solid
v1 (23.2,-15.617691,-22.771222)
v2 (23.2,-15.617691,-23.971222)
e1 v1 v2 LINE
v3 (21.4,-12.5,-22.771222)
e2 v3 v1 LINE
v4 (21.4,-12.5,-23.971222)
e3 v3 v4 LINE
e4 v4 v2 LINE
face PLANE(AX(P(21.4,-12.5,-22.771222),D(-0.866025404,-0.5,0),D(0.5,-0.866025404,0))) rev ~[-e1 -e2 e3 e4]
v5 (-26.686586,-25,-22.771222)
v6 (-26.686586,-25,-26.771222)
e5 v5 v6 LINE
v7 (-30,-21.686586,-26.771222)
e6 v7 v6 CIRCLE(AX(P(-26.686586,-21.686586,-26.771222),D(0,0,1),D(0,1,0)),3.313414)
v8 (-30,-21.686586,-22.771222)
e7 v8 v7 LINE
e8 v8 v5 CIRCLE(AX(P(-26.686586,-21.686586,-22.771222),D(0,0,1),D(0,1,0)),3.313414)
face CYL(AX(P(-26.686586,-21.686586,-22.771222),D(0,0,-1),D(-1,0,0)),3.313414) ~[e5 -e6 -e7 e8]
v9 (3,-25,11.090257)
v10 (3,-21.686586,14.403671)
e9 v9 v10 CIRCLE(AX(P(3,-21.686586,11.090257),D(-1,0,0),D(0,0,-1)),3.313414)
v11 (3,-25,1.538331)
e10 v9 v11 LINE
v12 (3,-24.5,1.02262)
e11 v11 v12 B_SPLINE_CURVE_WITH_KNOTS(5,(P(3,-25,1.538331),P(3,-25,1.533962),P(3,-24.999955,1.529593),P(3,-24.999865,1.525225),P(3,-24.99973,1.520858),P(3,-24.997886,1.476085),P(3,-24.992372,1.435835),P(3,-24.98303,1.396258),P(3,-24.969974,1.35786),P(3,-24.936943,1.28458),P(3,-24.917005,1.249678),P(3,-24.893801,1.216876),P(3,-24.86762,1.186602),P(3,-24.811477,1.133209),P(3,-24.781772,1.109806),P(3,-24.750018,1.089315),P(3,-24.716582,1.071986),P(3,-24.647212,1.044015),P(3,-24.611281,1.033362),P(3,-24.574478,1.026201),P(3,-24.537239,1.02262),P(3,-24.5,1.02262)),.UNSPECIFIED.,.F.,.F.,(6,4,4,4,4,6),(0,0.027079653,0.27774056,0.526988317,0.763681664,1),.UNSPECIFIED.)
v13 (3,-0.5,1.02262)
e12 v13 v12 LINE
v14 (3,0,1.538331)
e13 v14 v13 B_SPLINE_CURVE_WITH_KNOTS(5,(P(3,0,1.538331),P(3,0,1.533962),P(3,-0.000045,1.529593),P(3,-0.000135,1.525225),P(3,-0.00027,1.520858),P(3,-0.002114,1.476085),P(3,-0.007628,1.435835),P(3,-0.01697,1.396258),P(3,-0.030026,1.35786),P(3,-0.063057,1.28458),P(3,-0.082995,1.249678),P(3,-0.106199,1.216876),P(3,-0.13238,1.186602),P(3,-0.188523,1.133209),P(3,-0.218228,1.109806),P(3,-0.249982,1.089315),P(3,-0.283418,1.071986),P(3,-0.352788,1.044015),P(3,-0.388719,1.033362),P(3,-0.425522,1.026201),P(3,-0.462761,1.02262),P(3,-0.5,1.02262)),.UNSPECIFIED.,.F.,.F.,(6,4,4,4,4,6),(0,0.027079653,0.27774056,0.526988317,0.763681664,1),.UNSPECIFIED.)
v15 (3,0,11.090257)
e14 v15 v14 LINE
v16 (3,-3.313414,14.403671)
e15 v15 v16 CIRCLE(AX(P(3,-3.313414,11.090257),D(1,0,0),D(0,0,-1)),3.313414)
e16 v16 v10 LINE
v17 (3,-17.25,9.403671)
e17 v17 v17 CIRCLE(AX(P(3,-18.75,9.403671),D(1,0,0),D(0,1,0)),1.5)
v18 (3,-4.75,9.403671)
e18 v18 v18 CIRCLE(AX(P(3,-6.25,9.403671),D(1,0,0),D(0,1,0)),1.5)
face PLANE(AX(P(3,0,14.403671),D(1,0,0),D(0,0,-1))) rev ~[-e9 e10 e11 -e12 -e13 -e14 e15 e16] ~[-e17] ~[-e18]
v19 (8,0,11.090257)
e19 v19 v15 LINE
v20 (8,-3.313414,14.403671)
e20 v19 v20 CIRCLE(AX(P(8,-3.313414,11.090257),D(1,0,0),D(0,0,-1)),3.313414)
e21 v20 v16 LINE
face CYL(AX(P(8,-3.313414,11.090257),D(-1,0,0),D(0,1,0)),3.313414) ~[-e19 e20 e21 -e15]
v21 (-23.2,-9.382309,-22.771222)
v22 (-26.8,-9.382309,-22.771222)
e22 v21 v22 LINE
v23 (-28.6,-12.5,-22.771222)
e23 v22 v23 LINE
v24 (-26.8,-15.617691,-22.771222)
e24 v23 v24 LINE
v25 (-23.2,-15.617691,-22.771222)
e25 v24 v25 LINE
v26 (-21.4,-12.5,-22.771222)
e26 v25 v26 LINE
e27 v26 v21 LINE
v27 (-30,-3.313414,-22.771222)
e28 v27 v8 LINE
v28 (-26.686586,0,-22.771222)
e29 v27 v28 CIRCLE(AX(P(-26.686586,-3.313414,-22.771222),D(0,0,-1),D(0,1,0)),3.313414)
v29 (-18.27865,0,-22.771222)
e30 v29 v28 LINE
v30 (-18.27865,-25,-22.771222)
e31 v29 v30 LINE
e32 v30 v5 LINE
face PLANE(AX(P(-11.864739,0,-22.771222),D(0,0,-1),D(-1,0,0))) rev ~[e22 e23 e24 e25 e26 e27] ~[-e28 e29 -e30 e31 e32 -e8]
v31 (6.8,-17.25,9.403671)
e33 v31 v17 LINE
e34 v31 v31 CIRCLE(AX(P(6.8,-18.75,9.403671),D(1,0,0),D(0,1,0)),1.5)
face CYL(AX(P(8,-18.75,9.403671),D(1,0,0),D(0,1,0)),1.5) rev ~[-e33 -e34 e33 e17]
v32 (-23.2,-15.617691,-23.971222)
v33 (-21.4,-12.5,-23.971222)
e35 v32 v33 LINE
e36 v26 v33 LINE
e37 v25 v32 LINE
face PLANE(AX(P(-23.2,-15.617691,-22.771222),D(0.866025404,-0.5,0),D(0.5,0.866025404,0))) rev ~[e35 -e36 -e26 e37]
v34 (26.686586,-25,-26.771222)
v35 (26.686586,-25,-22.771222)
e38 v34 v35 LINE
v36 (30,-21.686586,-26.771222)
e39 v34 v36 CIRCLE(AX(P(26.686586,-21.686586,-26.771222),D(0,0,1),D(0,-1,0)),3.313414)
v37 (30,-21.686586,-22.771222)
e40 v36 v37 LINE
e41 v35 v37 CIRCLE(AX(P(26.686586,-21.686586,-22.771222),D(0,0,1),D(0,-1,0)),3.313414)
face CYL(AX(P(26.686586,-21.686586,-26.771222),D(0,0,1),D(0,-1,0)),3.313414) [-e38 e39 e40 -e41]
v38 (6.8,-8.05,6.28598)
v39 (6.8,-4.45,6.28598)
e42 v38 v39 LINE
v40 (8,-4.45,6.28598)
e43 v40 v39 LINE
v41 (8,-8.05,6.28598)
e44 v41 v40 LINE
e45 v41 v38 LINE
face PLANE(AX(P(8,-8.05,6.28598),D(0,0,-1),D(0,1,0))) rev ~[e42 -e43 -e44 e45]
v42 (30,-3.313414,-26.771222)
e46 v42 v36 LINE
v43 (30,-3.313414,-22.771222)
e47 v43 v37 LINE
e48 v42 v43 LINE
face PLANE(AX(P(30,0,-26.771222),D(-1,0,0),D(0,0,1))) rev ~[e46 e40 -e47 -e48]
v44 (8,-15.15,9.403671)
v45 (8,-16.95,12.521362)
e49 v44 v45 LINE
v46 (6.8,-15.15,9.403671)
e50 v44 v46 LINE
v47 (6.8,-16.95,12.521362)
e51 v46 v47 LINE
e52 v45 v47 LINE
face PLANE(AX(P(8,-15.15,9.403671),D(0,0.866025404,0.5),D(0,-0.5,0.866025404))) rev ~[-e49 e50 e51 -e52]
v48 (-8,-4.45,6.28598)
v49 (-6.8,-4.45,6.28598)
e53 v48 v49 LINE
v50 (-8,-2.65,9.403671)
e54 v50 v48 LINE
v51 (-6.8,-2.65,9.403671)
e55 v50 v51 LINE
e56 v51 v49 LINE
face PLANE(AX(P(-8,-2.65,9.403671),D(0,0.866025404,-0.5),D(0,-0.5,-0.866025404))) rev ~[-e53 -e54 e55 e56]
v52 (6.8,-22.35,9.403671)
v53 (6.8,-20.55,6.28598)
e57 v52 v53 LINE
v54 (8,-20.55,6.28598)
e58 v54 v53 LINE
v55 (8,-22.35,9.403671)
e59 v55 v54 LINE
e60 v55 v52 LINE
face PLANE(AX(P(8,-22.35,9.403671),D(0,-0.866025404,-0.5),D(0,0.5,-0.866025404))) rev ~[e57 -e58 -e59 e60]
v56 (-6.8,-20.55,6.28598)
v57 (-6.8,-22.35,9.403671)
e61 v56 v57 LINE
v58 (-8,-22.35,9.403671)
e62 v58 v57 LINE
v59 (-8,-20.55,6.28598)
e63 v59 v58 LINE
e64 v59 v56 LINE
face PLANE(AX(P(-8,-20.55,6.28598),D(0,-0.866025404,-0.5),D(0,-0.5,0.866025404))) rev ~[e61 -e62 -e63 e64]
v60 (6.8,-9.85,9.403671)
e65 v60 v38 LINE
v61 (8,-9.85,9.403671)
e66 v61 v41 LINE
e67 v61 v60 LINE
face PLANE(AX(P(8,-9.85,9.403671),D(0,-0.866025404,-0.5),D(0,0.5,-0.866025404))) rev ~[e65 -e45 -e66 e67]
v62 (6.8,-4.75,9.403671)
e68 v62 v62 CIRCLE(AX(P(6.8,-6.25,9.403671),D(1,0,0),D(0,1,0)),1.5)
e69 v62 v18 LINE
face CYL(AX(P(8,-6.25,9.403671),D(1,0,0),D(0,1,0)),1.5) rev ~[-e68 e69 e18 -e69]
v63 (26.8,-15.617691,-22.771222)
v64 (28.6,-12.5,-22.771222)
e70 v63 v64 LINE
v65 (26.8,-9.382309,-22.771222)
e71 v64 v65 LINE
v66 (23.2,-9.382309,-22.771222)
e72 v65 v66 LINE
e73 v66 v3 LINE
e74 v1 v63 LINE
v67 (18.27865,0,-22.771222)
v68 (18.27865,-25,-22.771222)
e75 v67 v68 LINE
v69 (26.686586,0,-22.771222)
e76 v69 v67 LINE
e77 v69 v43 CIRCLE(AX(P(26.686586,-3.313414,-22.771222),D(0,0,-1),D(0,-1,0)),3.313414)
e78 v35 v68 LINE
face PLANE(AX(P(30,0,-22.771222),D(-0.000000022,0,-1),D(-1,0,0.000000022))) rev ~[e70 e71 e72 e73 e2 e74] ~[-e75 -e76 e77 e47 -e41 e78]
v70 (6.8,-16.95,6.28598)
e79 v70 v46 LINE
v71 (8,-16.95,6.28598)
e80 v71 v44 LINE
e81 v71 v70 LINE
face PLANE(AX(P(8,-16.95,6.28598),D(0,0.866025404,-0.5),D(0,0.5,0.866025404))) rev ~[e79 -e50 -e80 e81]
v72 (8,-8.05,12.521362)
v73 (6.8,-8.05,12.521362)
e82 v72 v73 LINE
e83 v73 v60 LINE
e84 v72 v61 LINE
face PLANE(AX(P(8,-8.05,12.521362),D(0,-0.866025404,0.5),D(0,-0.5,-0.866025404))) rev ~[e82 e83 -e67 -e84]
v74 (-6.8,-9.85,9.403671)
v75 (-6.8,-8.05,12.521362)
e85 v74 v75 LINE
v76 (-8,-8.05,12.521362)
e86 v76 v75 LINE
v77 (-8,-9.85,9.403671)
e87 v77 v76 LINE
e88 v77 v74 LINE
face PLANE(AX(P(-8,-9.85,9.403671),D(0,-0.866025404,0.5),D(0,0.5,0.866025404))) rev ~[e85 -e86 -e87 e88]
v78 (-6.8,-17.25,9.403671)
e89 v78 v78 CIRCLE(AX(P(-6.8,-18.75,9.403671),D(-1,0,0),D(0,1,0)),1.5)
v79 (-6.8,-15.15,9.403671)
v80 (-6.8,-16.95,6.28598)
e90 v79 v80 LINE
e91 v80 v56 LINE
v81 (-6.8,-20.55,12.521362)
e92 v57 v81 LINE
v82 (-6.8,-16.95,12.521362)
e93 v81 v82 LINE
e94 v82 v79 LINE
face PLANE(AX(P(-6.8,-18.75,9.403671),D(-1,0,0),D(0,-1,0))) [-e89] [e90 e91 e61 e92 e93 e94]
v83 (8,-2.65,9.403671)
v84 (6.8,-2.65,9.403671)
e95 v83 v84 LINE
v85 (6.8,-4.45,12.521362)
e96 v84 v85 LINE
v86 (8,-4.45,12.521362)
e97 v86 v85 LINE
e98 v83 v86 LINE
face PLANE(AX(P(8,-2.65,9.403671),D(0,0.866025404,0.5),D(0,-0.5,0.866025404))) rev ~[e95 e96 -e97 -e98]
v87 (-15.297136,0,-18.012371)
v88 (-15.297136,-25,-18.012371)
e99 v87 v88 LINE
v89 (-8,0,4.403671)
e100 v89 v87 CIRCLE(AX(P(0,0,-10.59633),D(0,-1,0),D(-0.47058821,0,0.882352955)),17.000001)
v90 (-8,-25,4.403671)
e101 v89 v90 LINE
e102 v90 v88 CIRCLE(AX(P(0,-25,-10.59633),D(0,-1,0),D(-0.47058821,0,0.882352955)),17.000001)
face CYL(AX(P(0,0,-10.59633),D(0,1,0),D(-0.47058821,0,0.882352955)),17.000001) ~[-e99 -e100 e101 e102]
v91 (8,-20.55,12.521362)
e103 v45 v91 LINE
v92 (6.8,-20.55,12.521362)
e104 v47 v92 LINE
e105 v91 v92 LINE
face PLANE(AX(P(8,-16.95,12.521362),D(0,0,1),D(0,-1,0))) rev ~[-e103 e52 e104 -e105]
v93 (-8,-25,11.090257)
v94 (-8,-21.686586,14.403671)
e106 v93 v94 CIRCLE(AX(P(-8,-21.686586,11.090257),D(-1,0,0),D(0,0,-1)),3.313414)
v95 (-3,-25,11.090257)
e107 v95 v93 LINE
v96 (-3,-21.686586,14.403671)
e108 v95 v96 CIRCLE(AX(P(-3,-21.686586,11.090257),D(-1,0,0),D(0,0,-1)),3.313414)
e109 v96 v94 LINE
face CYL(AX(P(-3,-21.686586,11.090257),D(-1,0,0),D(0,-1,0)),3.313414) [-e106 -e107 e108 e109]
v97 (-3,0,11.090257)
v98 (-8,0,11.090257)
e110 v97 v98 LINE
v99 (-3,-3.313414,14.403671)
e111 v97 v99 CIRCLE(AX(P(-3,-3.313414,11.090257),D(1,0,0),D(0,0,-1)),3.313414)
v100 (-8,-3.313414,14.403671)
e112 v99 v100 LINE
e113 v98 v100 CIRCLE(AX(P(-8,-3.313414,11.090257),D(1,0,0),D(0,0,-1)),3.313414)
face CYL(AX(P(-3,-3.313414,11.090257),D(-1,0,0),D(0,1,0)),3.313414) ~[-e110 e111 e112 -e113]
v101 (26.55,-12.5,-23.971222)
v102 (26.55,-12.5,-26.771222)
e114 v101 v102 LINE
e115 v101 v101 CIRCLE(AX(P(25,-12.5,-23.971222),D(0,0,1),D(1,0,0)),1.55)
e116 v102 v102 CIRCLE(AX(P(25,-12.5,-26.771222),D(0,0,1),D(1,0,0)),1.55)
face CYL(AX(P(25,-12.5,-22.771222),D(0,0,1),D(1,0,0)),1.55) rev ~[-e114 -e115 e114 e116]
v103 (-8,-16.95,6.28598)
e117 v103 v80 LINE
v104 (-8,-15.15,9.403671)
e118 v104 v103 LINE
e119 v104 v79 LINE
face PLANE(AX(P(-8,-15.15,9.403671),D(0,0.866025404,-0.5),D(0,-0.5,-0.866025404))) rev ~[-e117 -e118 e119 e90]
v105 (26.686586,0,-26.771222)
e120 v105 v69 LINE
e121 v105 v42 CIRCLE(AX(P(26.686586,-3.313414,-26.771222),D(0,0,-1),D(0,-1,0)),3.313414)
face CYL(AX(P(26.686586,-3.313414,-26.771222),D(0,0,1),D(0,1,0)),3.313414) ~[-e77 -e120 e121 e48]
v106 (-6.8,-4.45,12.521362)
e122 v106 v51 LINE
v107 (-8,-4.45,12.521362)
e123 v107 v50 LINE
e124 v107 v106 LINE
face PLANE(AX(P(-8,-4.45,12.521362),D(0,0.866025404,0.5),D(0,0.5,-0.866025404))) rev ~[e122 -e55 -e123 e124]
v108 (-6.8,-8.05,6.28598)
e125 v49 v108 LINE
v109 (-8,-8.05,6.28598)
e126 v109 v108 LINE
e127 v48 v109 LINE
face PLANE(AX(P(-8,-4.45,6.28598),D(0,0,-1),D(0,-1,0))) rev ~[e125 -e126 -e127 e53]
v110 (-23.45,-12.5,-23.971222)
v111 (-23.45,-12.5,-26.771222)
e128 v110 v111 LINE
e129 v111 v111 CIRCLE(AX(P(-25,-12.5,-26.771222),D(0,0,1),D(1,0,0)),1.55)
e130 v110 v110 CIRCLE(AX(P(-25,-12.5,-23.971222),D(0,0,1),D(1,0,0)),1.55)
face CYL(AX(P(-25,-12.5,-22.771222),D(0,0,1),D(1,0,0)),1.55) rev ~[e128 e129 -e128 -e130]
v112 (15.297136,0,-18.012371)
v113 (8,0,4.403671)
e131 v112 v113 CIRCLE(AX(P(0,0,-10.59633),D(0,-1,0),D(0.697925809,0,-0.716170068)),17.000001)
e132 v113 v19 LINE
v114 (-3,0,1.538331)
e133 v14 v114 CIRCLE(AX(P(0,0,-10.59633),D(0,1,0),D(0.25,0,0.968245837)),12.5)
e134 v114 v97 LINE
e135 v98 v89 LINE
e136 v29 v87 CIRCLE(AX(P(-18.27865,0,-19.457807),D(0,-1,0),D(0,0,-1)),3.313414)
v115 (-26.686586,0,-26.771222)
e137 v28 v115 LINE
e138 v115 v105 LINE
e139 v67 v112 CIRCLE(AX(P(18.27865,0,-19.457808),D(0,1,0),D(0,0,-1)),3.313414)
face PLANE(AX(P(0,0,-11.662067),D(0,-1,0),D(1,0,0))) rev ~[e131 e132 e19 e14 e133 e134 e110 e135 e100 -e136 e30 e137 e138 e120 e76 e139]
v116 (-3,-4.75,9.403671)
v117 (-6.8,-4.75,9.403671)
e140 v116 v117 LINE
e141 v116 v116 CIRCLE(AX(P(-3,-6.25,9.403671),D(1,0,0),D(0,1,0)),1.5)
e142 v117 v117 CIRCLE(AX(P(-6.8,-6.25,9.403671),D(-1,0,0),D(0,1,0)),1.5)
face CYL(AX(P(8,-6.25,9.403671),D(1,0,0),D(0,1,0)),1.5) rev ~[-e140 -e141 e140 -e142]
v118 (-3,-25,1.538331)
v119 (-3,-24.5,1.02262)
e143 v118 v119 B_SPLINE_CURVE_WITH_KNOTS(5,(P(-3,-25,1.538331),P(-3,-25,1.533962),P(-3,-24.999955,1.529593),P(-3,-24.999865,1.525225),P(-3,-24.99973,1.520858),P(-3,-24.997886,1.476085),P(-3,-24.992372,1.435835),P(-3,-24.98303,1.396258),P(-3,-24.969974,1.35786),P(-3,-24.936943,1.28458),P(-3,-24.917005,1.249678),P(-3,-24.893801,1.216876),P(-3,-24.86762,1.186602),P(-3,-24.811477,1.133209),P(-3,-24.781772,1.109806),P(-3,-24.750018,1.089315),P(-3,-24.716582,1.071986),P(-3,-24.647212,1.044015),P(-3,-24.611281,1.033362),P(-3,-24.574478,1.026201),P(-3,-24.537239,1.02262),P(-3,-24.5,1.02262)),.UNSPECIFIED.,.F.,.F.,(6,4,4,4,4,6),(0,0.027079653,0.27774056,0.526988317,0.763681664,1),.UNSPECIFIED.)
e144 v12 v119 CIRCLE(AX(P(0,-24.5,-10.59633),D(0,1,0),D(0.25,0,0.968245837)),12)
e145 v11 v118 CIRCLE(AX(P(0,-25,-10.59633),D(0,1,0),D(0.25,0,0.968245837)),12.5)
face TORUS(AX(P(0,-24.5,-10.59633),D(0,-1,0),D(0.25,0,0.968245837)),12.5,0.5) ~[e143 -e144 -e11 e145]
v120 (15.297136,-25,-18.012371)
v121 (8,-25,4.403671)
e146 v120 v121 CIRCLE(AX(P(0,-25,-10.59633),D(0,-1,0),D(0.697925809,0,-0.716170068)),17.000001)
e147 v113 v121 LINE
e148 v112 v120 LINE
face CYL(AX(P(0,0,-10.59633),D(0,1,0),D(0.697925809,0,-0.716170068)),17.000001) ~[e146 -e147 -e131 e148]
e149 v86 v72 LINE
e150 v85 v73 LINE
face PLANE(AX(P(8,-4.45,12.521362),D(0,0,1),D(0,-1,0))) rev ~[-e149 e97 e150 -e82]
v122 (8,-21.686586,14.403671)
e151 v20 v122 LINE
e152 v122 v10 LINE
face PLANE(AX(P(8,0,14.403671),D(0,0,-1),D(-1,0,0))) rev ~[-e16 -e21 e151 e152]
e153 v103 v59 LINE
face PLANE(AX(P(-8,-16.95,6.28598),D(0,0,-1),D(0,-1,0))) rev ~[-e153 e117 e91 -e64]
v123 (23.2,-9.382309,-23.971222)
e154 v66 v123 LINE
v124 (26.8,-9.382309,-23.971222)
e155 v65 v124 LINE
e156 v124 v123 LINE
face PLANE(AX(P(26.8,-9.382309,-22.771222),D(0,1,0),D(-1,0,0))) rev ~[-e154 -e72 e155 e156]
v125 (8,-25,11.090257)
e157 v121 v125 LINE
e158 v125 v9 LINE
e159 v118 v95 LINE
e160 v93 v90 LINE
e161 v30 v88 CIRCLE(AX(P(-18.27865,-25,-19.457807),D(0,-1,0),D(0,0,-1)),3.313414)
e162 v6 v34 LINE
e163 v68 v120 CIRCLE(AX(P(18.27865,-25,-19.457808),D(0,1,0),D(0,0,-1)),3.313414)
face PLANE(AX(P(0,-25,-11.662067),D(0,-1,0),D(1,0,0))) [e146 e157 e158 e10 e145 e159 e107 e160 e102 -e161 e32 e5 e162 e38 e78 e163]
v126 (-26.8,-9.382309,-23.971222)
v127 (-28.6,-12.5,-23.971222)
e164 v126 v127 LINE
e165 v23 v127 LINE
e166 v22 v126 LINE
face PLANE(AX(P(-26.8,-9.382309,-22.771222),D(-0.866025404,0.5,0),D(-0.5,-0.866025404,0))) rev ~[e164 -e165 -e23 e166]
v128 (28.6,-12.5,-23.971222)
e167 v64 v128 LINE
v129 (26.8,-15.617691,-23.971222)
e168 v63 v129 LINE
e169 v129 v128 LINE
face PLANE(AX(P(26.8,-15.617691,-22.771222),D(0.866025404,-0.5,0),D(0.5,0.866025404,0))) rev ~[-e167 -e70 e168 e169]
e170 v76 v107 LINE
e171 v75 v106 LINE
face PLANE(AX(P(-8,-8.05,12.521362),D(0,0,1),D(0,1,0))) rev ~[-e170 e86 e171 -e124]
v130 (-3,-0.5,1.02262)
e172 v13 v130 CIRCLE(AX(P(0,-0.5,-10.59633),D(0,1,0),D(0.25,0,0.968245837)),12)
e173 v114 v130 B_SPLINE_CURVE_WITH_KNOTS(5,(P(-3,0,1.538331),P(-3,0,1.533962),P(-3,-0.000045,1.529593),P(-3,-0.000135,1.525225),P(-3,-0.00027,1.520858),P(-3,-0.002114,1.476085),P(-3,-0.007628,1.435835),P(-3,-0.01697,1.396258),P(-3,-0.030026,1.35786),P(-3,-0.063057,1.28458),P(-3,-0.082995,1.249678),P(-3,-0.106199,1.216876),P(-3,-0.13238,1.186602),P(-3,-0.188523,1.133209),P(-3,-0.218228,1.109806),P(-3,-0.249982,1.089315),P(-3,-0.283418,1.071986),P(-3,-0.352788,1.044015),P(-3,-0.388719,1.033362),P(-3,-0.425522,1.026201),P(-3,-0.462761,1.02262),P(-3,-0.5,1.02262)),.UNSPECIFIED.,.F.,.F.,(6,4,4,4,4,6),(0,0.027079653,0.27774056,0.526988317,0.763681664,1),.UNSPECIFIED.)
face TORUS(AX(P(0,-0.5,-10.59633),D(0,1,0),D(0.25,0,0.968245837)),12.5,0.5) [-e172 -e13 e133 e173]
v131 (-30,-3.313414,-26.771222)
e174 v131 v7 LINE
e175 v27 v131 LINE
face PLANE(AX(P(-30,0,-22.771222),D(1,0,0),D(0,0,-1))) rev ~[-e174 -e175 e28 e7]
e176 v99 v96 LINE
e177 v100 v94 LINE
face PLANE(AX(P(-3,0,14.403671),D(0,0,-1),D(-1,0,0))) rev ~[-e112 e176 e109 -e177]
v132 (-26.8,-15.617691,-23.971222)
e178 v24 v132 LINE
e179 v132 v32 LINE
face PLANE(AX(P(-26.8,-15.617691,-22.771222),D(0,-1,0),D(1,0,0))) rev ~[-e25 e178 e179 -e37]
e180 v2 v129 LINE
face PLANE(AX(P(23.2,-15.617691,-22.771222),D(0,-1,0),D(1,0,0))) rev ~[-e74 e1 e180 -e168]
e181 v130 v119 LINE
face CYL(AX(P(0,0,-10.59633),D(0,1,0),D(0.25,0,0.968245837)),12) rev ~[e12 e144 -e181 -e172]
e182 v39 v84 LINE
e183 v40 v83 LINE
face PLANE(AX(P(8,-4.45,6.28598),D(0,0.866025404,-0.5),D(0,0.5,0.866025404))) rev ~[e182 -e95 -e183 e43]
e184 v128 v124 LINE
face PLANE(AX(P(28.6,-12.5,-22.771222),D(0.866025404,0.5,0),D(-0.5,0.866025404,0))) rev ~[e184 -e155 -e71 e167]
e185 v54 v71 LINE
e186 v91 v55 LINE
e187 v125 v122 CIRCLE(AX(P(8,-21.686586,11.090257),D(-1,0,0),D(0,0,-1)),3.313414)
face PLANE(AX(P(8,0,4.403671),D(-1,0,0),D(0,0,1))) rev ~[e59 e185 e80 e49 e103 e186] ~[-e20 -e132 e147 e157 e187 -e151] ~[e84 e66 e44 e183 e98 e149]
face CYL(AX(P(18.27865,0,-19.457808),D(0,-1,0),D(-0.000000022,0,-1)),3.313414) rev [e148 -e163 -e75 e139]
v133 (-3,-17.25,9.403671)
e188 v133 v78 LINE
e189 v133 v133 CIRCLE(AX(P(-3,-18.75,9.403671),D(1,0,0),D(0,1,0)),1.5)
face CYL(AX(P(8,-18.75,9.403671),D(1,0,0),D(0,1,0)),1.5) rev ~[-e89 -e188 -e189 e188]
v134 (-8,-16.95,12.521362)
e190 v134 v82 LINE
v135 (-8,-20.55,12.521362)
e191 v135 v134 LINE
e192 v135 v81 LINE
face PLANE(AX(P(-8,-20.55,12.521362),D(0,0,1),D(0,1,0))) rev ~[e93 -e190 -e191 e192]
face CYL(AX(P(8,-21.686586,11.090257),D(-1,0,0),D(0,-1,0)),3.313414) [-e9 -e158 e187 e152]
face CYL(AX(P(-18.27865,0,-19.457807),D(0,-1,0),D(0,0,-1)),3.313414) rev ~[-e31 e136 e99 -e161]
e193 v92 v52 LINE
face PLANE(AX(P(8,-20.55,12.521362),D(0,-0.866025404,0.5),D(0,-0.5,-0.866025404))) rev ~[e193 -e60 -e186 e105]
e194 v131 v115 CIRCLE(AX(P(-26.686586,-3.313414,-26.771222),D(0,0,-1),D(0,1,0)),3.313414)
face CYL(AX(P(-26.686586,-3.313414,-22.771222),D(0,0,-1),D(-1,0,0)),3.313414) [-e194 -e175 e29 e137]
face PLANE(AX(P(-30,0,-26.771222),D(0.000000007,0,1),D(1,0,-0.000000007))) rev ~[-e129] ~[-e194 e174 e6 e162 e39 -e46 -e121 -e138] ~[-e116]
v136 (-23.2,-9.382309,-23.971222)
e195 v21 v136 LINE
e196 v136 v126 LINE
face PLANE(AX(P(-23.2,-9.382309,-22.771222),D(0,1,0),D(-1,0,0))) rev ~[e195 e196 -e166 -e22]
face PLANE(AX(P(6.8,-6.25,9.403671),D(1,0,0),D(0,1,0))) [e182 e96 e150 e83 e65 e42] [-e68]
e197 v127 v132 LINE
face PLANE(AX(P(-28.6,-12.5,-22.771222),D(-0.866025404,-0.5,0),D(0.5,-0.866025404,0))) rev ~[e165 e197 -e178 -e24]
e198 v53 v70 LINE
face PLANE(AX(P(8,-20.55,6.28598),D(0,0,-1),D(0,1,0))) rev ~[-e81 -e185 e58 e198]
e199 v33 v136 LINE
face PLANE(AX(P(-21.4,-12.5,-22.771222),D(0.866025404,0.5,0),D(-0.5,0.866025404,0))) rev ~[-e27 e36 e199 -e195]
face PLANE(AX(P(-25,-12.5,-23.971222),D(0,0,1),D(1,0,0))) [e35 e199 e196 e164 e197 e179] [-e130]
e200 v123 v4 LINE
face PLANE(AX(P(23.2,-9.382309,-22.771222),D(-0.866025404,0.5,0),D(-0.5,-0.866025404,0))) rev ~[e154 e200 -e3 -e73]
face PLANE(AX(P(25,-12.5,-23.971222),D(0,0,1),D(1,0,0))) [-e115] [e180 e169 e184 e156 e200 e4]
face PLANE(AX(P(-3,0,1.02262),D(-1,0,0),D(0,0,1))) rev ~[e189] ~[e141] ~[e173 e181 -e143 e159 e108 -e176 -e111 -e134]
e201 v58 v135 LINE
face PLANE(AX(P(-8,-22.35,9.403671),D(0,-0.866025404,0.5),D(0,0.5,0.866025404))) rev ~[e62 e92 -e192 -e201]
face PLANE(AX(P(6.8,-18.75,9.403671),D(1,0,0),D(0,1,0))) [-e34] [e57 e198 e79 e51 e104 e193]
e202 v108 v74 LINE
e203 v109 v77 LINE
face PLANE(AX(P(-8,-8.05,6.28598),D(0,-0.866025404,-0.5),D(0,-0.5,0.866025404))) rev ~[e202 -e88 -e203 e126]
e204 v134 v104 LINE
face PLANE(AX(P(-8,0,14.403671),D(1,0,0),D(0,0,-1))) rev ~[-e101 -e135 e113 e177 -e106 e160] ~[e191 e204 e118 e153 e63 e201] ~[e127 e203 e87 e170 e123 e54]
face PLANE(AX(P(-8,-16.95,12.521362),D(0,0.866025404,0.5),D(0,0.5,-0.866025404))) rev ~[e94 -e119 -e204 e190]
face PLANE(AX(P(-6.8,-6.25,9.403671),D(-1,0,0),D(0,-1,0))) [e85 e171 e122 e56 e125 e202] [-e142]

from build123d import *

# Parameters (mm, degrees)
F1_DEPTH  = 25
F2_R      = 1.55
F3_DEPTH  = 25
F4_R      = 1.5
F5_DEPTH  = 25
F6_R      = 3.3134143982
F9_DEPTH  = 1.2
F8_R      = 1.5
F10_DEPTH = 1.2
F12_DEPTH = 1.2
F13_R     = 0.5


# Not quite as in the source:
# - ends of sketch curves that miss each other by under 0.0002 mm in the source are joined


with BuildPart() as f1:
    # F0 (on Front) → F1 (new body)
    with BuildSketch(Plane.XZ):
        with BuildLine():
            Line((-30, -26.7712218283), (30, -26.771222222))
            Line((30, -26.771222222), (30, -22.771222222))
            Line((30, -22.771222222), (11.8647393899, -22.7712218283))
            ThreePointArc((11.8647393899, -22.7712218283), (16.8306466966, -8.2027211962), (8, 4.4036710302))
            Line((8, 4.4036710302), (8, 14.4036710302))
            Line((8, 14.4036710302), (3, 14.4036710302))
            Line((3, 14.4036710302), (3, 6.1368714524))
            Line((3, 6.1368714524), (3, 4.8868714524))
            Line((3, 4.8868714524), (3, 1.0226200218))
            ThreePointArc((3, 1.0226200218), (0, -22.5963300169), (-3, 1.0226200218))
            Line((-3, 1.0226200218), (-3, 4.8868714524))
            Line((-3, 4.8868714524), (-3, 14.4036710302))
            Line((-3, 14.4036710302), (-8, 14.4036710302))
            Line((-8, 14.4036710302), (-8, 4.4036710302))
            ThreePointArc((-8, 4.4036710302), (-16.8306466966, -8.2027211962), (-11.8647393899, -22.7712218283))
            Line((-11.8647393899, -22.7712218283), (-30, -22.7712218283))
            Line((-30, -22.7712218283), (-30, -26.7712218283))
        make_face()
    extrude(amount=F1_DEPTH)

    # F2 (on face) → F3 (cut)
    with BuildSketch(Plane.XY.offset(-22.7712218283)):
        with Locations((-25, -12.5)):
            Circle(F2_R)
        with Locations((25, -12.5)):
            Circle(F2_R)
    extrude(amount=-F3_DEPTH, mode=Mode.SUBTRACT)

    # F4 (on face) → F5 (cut)
    with BuildSketch(Plane.YZ.offset(8)):
        with Locations((-18.75, 9.4036710302)):
            Circle(F4_R)
        with Locations((-6.25, 9.4036710302)):
            Circle(F4_R)
    extrude(amount=-F5_DEPTH, mode=Mode.SUBTRACT)

    # F6
    f6_edges = [f1.edges().sort_by_distance(p)[0] for p in [
        (-5.5, -25, 14.403671),
        (5.5, -25, 14.403671),
        (-5.5, 0, 14.403671),
        (5.5, 0, 14.403671),
        (30, -25, -24.771222),
        (30, 0, -24.771222),
        (-30, 0, -24.771222),
        (-30, -25, -24.771222),
        (11.864739, -12.5, -22.771222),
        (-11.864739, -12.5, -22.771222),
    ]]
    fillet(f6_edges, radius=F6_R)

    # F7 (on face) → F9 (cut)
    with BuildSketch(Plane.YZ.offset(8)):
        Polygon((-20.55, 6.2859795766), (-16.95, 6.2859795766), (-15.15, 9.4036710302), (-16.95, 12.5213624838), (-20.55, 12.5213624838), (-22.35, 9.4036710302), align=None)
        Polygon((-4.45, 12.5213624838), (-8.05, 12.5213624838), (-9.85, 9.4036710302), (-8.05, 6.2859795766), (-4.45, 6.2859795766), (-2.65, 9.4036710302), align=None)
    extrude(amount=-F9_DEPTH, mode=Mode.SUBTRACT)

    # F8 (on face) → F10 (cut)
    with BuildSketch(Plane(origin=(-8, 0, 0), x_dir=(0, -1, 0), z_dir=(-1, 0, 0))):
        Polygon((4.45, 6.2859795766), (8.05, 6.2859795766), (9.85, 9.4036710302), (8.05, 12.5213624838), (4.45, 12.5213624838), (2.65, 9.4036710302), align=None)
        with Locations((6.25, 9.4036710302)):
            Circle(F8_R, mode=Mode.SUBTRACT)
        Polygon((20.55, 12.5213624838), (16.95, 12.5213624838), (15.15, 9.4036710302), (16.95, 6.2859795766), (20.55, 6.2859795766), (22.35, 9.4036710302), align=None)
        with Locations((18.75, 9.4036710302)):
            Circle(F8_R, mode=Mode.SUBTRACT)
    extrude(amount=-F10_DEPTH, mode=Mode.SUBTRACT)

    # F11 (on face) → F12 (cut)
    with BuildSketch(Plane.XY.offset(-22.7712218283)):
        Polygon((26.8, -9.3823085464), (23.2, -9.3823085464), (21.4, -12.5), (23.2, -15.6176914536), (26.8, -15.6176914536), (28.6, -12.5), align=None)
        Polygon((-23.2, -15.6176914536), (-21.4, -12.5), (-23.2, -9.3823085464), (-26.8, -9.3823085464), (-28.6, -12.5), (-26.8, -15.6176914536), align=None)
    extrude(amount=-F12_DEPTH, mode=Mode.SUBTRACT)

    # F13
    f13_edges = [f1.edges().sort_by_distance(p)[0] for p in [
        (0, 0, -22.59633),
        (0, -25, -22.59633),
    ]]
    fillet(f13_edges, radius=F13_R)


solid = f1.part
